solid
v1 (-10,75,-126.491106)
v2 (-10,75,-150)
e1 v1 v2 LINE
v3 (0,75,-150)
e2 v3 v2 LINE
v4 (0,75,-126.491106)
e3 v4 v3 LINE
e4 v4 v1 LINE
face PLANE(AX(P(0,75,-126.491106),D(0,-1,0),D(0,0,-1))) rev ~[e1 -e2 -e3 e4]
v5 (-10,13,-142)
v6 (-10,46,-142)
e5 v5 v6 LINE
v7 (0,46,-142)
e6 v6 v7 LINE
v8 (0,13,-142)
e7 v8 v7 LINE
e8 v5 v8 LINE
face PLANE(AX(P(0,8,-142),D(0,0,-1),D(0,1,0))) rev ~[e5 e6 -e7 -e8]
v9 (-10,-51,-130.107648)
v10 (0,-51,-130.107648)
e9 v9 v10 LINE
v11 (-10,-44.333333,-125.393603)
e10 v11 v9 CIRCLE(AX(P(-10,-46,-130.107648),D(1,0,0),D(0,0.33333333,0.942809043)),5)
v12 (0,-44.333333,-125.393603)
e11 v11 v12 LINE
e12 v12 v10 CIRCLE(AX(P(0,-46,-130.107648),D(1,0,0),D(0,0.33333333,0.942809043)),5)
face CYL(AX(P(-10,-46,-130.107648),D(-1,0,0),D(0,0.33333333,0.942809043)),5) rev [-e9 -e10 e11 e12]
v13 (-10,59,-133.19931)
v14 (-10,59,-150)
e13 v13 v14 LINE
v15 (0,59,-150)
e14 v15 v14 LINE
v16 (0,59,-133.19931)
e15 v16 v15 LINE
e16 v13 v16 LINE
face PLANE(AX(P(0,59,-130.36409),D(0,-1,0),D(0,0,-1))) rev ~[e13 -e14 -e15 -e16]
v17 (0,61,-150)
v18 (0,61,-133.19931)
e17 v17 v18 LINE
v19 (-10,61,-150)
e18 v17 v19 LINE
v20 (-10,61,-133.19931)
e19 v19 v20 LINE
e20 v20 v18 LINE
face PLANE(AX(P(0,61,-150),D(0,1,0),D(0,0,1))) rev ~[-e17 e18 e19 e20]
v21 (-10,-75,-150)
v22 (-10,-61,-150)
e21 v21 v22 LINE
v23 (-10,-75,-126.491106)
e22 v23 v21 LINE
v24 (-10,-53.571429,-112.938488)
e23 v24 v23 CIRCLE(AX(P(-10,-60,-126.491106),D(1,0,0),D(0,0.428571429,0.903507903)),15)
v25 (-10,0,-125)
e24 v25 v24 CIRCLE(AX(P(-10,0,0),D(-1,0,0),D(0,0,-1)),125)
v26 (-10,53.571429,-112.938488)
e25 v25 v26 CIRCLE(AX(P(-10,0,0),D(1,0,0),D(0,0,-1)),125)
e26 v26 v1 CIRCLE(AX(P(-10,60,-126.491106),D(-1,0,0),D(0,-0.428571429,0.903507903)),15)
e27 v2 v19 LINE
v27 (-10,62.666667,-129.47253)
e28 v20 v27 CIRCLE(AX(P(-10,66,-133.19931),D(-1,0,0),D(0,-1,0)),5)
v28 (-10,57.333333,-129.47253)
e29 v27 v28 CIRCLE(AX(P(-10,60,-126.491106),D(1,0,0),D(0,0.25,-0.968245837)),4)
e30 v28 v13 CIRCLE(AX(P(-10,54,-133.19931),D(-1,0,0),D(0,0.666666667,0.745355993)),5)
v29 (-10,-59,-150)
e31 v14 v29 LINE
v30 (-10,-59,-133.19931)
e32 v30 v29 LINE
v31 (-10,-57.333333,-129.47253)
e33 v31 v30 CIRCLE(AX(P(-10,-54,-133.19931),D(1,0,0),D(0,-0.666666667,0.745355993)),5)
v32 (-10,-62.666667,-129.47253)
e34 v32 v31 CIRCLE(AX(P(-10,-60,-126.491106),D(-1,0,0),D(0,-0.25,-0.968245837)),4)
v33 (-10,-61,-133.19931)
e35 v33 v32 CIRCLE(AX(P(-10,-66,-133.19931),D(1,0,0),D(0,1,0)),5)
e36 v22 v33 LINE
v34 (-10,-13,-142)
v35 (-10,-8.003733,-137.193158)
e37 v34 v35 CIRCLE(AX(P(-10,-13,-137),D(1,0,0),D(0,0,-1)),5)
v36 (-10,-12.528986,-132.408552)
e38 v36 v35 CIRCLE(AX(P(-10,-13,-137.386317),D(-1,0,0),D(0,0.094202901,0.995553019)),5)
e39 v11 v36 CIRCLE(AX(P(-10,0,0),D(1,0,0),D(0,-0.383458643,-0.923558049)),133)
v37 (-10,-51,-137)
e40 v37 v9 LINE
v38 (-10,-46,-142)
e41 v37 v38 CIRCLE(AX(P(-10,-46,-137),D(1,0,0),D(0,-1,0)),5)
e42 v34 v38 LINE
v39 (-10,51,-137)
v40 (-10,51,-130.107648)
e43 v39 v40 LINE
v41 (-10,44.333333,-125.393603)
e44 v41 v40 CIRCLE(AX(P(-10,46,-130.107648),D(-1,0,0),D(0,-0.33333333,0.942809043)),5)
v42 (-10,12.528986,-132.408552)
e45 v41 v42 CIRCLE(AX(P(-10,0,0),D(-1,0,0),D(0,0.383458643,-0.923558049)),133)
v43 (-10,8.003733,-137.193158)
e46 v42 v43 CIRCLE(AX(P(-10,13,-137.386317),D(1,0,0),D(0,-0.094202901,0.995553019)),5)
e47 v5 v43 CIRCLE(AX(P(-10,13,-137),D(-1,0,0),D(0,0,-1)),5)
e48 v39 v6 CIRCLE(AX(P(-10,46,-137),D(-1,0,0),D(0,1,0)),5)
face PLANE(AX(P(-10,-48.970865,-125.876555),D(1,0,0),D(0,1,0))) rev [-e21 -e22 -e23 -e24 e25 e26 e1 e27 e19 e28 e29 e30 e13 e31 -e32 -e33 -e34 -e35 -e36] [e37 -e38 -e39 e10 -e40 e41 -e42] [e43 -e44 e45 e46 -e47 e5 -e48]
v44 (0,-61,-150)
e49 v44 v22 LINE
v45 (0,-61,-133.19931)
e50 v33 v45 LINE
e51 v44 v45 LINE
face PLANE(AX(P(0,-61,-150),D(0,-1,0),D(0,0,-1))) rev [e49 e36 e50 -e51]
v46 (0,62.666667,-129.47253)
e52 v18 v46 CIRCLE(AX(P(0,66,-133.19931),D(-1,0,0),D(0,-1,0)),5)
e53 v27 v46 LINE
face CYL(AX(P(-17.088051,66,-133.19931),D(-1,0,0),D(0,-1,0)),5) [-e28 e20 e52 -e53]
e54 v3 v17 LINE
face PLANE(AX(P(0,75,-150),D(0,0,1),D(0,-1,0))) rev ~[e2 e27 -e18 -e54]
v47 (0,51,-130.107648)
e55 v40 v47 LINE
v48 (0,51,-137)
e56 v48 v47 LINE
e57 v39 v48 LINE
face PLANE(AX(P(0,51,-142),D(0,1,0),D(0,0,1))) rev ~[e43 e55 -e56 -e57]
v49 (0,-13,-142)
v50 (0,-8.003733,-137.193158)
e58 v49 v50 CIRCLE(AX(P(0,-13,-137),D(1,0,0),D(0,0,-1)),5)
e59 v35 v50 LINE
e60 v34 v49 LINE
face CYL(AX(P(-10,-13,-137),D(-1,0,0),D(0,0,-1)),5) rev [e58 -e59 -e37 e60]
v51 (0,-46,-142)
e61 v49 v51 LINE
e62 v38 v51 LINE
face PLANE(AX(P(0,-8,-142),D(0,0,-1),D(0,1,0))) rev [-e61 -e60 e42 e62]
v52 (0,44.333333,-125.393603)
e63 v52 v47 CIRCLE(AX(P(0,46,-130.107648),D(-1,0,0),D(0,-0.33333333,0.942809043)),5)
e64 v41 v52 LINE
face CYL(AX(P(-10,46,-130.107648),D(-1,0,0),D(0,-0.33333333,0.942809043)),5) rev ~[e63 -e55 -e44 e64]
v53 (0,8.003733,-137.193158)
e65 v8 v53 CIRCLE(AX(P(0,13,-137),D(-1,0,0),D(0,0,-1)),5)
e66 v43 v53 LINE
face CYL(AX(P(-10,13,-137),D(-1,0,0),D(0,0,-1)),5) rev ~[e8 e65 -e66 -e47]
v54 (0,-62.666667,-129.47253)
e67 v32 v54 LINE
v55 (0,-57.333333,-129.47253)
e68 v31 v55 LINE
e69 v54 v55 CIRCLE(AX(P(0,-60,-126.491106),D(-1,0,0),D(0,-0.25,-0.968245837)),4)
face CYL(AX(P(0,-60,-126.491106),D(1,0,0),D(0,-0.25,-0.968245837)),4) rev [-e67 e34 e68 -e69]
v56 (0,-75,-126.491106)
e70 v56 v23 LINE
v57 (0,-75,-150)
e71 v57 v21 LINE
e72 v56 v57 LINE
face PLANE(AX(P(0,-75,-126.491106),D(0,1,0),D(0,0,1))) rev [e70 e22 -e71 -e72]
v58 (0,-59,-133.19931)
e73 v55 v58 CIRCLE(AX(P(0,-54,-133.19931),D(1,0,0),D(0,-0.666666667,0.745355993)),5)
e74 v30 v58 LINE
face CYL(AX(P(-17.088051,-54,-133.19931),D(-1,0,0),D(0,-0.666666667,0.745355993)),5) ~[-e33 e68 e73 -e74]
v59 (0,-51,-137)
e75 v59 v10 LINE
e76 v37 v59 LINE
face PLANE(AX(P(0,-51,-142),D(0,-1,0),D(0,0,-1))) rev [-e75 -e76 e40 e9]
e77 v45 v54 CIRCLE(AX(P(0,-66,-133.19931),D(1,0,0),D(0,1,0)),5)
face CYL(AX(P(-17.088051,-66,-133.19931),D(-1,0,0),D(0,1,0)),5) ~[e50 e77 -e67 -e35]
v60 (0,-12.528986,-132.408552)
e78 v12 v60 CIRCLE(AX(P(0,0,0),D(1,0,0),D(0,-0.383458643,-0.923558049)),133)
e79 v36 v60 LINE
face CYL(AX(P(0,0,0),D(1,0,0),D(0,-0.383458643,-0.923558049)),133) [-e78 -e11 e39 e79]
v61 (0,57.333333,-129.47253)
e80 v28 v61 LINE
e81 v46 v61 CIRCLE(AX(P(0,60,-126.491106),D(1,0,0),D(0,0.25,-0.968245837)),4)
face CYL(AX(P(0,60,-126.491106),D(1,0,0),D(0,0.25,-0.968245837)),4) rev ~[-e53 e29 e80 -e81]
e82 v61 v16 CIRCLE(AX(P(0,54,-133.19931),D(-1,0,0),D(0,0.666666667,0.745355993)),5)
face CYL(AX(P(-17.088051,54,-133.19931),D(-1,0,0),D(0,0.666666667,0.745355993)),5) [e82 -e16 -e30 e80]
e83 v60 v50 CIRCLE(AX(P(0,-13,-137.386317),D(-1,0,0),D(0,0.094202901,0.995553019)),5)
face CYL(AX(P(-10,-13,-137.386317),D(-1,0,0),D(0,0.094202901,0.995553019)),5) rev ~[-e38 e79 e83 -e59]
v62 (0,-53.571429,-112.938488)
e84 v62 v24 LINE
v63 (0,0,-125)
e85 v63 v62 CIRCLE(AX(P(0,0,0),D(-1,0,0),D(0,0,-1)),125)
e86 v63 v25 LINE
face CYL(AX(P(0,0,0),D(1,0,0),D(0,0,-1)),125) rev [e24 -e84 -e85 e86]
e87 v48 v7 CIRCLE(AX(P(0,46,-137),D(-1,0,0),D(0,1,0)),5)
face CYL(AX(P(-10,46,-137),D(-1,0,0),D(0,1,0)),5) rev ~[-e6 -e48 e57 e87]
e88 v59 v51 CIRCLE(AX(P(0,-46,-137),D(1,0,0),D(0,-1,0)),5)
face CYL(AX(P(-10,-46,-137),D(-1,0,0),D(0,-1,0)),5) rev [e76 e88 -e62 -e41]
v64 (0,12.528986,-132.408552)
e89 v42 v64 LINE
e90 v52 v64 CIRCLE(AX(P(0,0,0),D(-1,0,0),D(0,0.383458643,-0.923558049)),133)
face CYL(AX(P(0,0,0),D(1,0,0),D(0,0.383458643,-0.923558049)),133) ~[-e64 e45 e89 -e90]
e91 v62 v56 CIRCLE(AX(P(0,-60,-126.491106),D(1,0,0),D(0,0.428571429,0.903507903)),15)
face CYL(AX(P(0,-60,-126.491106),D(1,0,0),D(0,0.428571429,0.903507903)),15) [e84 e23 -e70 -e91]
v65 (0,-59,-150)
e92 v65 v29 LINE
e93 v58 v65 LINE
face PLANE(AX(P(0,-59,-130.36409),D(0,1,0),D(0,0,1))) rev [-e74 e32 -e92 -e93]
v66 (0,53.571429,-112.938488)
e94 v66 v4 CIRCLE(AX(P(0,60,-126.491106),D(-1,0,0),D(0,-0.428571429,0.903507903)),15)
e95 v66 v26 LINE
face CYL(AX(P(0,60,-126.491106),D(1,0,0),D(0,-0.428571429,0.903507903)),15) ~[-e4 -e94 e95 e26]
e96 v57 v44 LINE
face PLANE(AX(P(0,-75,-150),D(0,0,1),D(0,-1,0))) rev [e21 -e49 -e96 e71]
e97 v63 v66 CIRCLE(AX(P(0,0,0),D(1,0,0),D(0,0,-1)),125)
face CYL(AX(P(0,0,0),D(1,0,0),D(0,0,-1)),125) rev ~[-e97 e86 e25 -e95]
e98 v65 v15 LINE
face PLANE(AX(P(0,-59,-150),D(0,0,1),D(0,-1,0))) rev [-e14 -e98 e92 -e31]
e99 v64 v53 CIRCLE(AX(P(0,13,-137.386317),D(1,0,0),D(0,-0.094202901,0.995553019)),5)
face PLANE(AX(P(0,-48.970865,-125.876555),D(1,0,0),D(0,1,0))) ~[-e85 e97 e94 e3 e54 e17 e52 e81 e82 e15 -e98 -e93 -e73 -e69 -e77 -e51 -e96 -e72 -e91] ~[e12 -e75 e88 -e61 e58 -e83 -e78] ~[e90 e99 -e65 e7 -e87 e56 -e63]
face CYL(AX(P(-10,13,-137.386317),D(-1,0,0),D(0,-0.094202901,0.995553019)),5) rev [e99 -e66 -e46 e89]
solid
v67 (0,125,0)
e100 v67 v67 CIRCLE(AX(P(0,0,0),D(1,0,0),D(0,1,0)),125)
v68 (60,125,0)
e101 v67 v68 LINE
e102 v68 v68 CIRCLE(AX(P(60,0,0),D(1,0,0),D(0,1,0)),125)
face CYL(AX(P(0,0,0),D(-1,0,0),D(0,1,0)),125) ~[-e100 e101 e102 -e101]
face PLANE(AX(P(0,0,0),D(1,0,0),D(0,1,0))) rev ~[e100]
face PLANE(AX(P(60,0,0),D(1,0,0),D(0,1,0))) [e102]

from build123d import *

# Parameters (mm, degrees)
F0_R        = 125
F1_DEPTH    = 60
F3_DEPTH    = 10
F4_T1_DEPTH = 10
F4_T3_DEPTH = 24.1761029315


# Not quite as in the source:
# - a fillet or chamfer that OpenCascade refuses, or shapes differently, is made with other operations: its cross-section is extruded or revolved along the edge and cut away or added
# - a feature names something its author has since deleted; it is built from what else it names


with BuildPart() as f1:
    # F0 (on Right) → F1 (new body)
    with BuildSketch(Plane.YZ):
        Circle(F0_R)
    extrude(amount=F1_DEPTH)


with BuildPart() as f3:
    # F2 (on face) → F3 (new body)
    with BuildSketch(Plane(origin=(0, 0, 0), x_dir=(0, -1, 0), z_dir=(-1, 0, 0))):
        with BuildLine():
            ThreePointArc((0, -125), (-27.4562289572, -121.9473472096), (-53.5714285714, -112.9384878632))
            ThreePointArc((-53.5714285714, -112.9384878632), (-68.0178372574, -113.8137925858), (-75, -126.4911064067))
            Line((-75, -126.4911064067), (-75, -150))
            Line((-75, -150), (-61, -150))
            Line((-61, -150), (-61, -130.3640897529))
            ThreePointArc((-61, -130.3640897529), (-60, -122.4911064067), (-59, -130.3640897529))
            Line((-59, -130.3640897529), (-59, -150))
            Line((-59, -150), (0, -150))
            Line((0, -150), (0, -125))
        make_face()
        with BuildLine():
            Line((-8.00000038, -141.99999962), (-50.99999962, -141.99999962))
            Line((-50.99999962, -141.99999962), (-50.99999962, -130.3640897529))
            Line((-50.99999962, -130.3640897529), (-50.99999962, -122.8332208315))
            ThreePointArc((-50.99999962, -122.8332208315), (-29.914564521, -129.5921252646), (-8.00000038, -132.7591808313))
            Line((-8.00000038, -132.7591808313), (-8.00000038, -141.99999962))
        make_face(mode=Mode.SUBTRACT)
    extrude(amount=F3_DEPTH)

    # F4: fillet of radius 5 on 6 edges, made by hand

    # F4_s2 → F4_t1 (join)
    with BuildSketch(Plane.YZ.offset(-10)):
        with BuildLine():
            ThreePointArc((44.3333329717, -125.3936030613), (48.8867509739, -126.0251653767), (50.99999962, -130.1076482757))
            Line((50.99999962, -130.1076482757), (50.99999962, -122.8332208315))
            ThreePointArc((50.99999962, -122.8332208315), (47.6838543435, -124.1581658048), (44.3333329717, -125.3936030613))
        make_face()
        with BuildLine():
            ThreePointArc((50.99999962, -136.99999962), (49.535533526, -140.535533526), (45.99999962, -141.99999962))
            Line((45.99999962, -141.99999962), (50.99999962, -141.99999962))
            Line((50.99999962, -141.99999962), (50.99999962, -136.99999962))
        make_face()
        with BuildLine():
            ThreePointArc((13.00000038, -141.99999962), (9.464466474, -140.535533526), (8.00000038, -136.99999962))
            Line((8.00000038, -136.99999962), (8.00000038, -141.99999962))
            Line((8.00000038, -141.99999962), (13.00000038, -141.99999962))
        make_face()
        with BuildLine():
            ThreePointArc((12.5289858748, -132.4085518916), (9.3016850523, -134.0214301028), (8.00000038, -137.3863169861))
            Line((8.00000038, -137.3863169861), (8.00000038, -132.7591808313))
            ThreePointArc((8.00000038, -132.7591808313), (10.2659901775, -132.6032033804), (12.5289858748, -132.4085518916))
        make_face()
    extrude(amount=F4_T1_DEPTH)

    # F4_s4 → F4_t3 (cut)
    with BuildSketch(Plane.YZ.offset(-17.0880514658)):
        with BuildLine():
            ThreePointArc((57.3333333333, -129.4725303767), (58.5643546459, -131.1580688869), (59, -133.1993103392))
            Line((59, -133.1993103392), (59, -130.3640897529))
            ThreePointArc((59, -130.3640897529), (58.1132486541, -130.018168833), (57.3333333333, -129.4725303767))
        make_face()
        with BuildLine():
            ThreePointArc((61, -133.1993103392), (61.4356453541, -131.1580688869), (62.6666666667, -129.4725303767))
            ThreePointArc((62.6666666667, -129.4725303767), (61.8867513459, -130.018168833), (61, -130.3640897529))
            Line((61, -130.3640897529), (61, -133.1993103392))
        make_face()
    extrude(amount=F4_T3_DEPTH, mode=Mode.SUBTRACT)

    # F5: F3 across face


with BuildPart() as f3_1:
    add(f3.part)
    add(f3.part.mirror(Plane(origin=(-5, 0, -137.5), x_dir=(1, 0, 0), z_dir=(0, -1, 0))))


solid = Compound([f1.part, f3_1.part])
